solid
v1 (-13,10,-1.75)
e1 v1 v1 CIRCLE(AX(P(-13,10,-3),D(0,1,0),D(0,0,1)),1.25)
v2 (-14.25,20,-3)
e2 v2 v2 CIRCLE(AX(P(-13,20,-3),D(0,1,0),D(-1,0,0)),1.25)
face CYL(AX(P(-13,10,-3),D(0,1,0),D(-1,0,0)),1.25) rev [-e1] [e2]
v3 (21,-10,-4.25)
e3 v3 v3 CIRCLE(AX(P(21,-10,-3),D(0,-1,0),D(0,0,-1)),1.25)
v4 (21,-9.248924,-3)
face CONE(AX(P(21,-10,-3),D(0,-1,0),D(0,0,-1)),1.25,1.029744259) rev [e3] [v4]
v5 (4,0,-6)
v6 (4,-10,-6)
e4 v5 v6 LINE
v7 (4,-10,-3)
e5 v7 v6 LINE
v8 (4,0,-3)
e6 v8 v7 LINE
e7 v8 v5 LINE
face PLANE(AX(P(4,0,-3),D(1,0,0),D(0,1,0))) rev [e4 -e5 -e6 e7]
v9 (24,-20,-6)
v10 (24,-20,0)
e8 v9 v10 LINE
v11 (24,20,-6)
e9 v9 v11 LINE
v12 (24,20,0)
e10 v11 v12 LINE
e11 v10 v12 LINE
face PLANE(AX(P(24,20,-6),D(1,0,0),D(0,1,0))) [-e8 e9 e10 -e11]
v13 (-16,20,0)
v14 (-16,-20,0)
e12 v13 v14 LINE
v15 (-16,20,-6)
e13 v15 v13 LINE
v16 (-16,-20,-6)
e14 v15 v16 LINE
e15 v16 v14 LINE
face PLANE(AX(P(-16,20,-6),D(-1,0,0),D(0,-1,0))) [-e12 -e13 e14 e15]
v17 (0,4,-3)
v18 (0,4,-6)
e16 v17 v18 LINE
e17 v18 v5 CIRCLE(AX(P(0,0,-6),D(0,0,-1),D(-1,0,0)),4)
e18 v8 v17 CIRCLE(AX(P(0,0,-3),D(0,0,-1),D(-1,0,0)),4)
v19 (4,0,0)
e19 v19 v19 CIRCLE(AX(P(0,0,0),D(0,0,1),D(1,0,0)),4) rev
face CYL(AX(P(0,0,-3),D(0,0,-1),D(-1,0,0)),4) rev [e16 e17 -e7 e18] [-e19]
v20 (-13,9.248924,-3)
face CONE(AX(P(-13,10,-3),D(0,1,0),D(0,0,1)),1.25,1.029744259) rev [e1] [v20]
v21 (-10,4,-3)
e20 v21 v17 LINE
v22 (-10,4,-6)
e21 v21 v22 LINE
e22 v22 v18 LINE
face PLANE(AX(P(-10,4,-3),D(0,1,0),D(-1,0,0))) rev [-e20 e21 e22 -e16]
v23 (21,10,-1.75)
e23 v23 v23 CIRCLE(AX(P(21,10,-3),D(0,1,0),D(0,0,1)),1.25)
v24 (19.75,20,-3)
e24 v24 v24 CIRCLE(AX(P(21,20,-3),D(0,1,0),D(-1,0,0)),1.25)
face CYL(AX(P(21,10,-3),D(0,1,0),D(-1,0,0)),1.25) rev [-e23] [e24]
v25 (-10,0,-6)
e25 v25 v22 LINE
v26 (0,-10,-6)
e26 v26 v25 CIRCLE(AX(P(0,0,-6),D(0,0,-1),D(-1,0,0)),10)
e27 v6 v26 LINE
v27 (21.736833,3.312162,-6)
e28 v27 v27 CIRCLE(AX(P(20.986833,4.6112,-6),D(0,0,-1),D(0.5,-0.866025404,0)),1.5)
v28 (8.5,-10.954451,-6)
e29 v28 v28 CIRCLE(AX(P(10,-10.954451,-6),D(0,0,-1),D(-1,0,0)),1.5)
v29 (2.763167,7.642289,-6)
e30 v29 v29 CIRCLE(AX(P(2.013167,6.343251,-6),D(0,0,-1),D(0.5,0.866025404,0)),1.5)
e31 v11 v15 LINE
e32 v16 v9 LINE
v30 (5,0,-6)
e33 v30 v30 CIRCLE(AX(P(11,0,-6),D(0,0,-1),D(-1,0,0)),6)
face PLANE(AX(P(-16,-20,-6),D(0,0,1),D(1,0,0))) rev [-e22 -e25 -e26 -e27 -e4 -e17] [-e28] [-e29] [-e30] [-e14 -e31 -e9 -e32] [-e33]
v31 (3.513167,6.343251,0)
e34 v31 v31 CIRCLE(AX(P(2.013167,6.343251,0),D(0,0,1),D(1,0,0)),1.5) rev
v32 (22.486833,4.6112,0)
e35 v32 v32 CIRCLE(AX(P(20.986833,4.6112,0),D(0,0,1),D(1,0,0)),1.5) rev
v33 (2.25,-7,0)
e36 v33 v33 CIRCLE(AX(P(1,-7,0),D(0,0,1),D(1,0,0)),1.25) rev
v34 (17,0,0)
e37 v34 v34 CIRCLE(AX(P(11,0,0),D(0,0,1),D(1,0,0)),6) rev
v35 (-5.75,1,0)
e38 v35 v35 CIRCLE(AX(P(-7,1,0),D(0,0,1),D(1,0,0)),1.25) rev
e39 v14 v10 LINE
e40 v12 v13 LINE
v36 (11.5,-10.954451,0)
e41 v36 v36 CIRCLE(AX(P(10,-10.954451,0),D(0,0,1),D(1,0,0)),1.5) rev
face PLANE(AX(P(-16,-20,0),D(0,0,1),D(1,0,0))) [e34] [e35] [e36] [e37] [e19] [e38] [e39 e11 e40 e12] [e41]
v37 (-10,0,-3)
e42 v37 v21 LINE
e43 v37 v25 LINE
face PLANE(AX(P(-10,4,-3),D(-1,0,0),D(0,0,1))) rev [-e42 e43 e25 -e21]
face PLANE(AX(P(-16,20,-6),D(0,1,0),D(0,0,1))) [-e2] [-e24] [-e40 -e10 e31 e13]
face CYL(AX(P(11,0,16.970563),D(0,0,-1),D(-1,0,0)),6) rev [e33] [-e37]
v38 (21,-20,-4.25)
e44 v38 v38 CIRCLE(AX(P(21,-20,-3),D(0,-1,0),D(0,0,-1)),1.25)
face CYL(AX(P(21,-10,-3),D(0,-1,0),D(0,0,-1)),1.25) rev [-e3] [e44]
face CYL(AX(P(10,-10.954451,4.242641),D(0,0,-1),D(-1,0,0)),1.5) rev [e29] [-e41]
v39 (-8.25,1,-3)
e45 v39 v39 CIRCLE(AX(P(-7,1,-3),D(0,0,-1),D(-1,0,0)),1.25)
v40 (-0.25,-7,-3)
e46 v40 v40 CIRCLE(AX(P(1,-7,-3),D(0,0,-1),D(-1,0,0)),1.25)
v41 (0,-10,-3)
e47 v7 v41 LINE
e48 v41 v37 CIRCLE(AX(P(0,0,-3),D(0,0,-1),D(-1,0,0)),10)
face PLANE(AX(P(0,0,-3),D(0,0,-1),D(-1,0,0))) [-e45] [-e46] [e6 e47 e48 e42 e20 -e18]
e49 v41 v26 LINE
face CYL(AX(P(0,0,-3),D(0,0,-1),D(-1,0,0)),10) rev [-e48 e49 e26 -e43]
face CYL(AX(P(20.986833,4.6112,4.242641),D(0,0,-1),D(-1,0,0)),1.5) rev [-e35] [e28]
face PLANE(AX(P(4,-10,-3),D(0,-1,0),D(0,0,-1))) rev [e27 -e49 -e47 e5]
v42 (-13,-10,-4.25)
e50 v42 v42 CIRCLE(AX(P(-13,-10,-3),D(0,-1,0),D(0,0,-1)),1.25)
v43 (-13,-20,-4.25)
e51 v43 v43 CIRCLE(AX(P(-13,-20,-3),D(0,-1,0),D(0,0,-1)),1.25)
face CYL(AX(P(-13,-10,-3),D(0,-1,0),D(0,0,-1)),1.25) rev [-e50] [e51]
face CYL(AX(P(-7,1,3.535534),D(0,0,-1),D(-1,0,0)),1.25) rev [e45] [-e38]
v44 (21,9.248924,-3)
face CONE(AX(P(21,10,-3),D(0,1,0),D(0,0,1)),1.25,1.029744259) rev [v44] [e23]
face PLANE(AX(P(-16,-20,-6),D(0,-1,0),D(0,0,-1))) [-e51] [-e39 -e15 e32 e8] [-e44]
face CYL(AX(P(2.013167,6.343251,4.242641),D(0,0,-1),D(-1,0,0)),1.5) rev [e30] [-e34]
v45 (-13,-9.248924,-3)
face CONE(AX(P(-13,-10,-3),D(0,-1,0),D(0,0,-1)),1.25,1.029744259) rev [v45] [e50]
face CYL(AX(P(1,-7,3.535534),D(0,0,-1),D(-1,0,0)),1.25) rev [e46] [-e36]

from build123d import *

# Parameters (mm, degrees)
SKETCH1_W           = 40
SKETCH1_H           = 40
EXTRUDE1_DEPTH      = 6
SKETCH8_R           = 6
CUT_EXTRUDE6_DEPTH  = 6
SKETCH5_R           = 1.5
CUT_EXTRUDE4_DEPTH  = 6
CIRPATTERN1_COUNT   = 3
CUT_EXTRUDE13_DEPTH = 3
SKETCH20_R          = 4
CUT_EXTRUDE14_DEPTH = 3
SKETCH25_R          = 1.25
EXTRUDE4_DEPTH      = 3
SKETCH27_R          = 1.25
EXTRUDE9_DEPTH      = 10
EXTRUDE7_START      = -10
SKETCH29_R          = 1.25
EXTRUDE7_DEPTH      = 10


# Read off the part's stored shape, not the designer's step: M3 Tapped Hole1
with BuildPart() as part:
    # Sketch1 → Extrude1 (new body)
    with BuildSketch(Plane.XY):
        with Locations((4, 0)):
            Rectangle(SKETCH1_W, SKETCH1_H)
    extrude(amount=-EXTRUDE1_DEPTH)

    # Sketch8 → Cut-Extrude6 (cut)
    with BuildSketch(Plane(origin=(0, 0, -6), x_dir=(-1, 0, 0), z_dir=(0, 0, -1))):
        with Locations((-11, 0)):
            Circle(SKETCH8_R)
    extrude(amount=-CUT_EXTRUDE6_DEPTH, mode=Mode.SUBTRACT)

    # Sketch5 → Cut-Extrude4 (cut)
    with BuildSketch(Plane(origin=(0, 0, -6), x_dir=(-1, 0, 0), z_dir=(0, 0, -1))):
        with Locations((-10, -10.95445115)):
            Circle(SKETCH5_R)
    cut_extrude4 = extrude(amount=-CUT_EXTRUDE4_DEPTH, mode=Mode.SUBTRACT)

    # CirPattern1: Cut-Extrude4 ×3 about axis
    cirpattern1_axis = Axis((11, 0, 0), (0, 0, 1))
    for i in range(1, CIRPATTERN1_COUNT):
        add(cut_extrude4.rotate(cirpattern1_axis, i * 360 / CIRPATTERN1_COUNT), mode=Mode.SUBTRACT)

    # Sketch19 → Cut-Extrude13 (cut)
    with BuildSketch(Plane(origin=(0, 0, -6), x_dir=(-1, 0, 0), z_dir=(0, 0, -1))):
        with BuildLine():
            Line((10, 4), (0, 4))
            ThreePointArc((0, 4), (-2.828427125, 2.828427125), (-4, 0))
            Line((-4, 0), (-4, -10))
            Line((-4, -10), (0, -10))
            ThreePointArc((0, -10), (7.071067812, -7.071067812), (10, 0))
            Line((10, 0), (10, 4))
        make_face()
    extrude(amount=-CUT_EXTRUDE13_DEPTH, mode=Mode.SUBTRACT)

    # Sketch20 → Cut-Extrude14 (cut)
    with BuildSketch(Plane(origin=(0, 0, -3), x_dir=(-1, 0, 0), z_dir=(0, 0, -1))):
        with Locations(Location((0, 0, 0), (0, 0, 180))):
            Circle(SKETCH20_R)
    extrude(amount=-CUT_EXTRUDE14_DEPTH, mode=Mode.SUBTRACT)

    # Sketch25 → Extrude4 (cut)
    with BuildSketch(Plane(origin=(0, 0, -3), x_dir=(-1, 0, 0), z_dir=(0, 0, -1))):
        with Locations((-1, -7)):
            Circle(SKETCH25_R)
        with Locations((7, 1)):
            Circle(SKETCH25_R)
    extrude(amount=-EXTRUDE4_DEPTH, mode=Mode.SUBTRACT)

    # Sketch27 → Extrude9 (cut)
    with BuildSketch(Plane(origin=(0, 20, 0), x_dir=(1, 0, 0), z_dir=(0, 1, 0))):
        with Locations(Location((-13, 3, 0), (0, 0, 180))):
            Circle(SKETCH27_R)
        with Locations(Location((21, 3, 0), (0, 0, 180))):
            Circle(SKETCH27_R)
    extrude(amount=-EXTRUDE9_DEPTH, mode=Mode.SUBTRACT)

    # Sketch29 → Extrude7 (cut)
    with BuildSketch(Plane.XZ.offset(20).offset(EXTRUDE7_START)):
        with Locations(Location((-13, -3, 0), (0, 0, 180))):
            Circle(SKETCH29_R)
        with Locations(Location((21, -3, 0), (0, 0, 180))):
            Circle(SKETCH29_R)
    extrude(amount=EXTRUDE7_DEPTH, mode=Mode.SUBTRACT)

    # M3 Tapped Hole1 outline → M3 Tapped Hole1 (revolve, cut)
    with BuildSketch(Plane(origin=(-13, 0, -3), x_dir=(1, 0, 0), z_dir=(0, 0, 1))):
        Polygon((1.25, -10), (0, -9.248924226), (0, -10), align=None)
        Polygon((0, 10), (0, 9.248924226), (1.25, 10), align=None)
    revolve(axis=Axis((-13, 0, -3), (0, 1, 0)), mode=Mode.SUBTRACT)

    # M3 Tapped Hole1 2 outline → M3 Tapped Hole1 2 (revolve, cut)
    with BuildSketch(Plane(origin=(21, 0, -3), x_dir=(1, 0, 0), z_dir=(0, 0, 1))):
        Polygon((1.25, -10), (0, -9.248924226), (0, -10), align=None)
        Polygon((0, 10), (0, 9.248924226), (1.25, 10), align=None)
    revolve(axis=Axis((21, 0, -3), (0, 1, 0)), mode=Mode.SUBTRACT)


solid = part.part
